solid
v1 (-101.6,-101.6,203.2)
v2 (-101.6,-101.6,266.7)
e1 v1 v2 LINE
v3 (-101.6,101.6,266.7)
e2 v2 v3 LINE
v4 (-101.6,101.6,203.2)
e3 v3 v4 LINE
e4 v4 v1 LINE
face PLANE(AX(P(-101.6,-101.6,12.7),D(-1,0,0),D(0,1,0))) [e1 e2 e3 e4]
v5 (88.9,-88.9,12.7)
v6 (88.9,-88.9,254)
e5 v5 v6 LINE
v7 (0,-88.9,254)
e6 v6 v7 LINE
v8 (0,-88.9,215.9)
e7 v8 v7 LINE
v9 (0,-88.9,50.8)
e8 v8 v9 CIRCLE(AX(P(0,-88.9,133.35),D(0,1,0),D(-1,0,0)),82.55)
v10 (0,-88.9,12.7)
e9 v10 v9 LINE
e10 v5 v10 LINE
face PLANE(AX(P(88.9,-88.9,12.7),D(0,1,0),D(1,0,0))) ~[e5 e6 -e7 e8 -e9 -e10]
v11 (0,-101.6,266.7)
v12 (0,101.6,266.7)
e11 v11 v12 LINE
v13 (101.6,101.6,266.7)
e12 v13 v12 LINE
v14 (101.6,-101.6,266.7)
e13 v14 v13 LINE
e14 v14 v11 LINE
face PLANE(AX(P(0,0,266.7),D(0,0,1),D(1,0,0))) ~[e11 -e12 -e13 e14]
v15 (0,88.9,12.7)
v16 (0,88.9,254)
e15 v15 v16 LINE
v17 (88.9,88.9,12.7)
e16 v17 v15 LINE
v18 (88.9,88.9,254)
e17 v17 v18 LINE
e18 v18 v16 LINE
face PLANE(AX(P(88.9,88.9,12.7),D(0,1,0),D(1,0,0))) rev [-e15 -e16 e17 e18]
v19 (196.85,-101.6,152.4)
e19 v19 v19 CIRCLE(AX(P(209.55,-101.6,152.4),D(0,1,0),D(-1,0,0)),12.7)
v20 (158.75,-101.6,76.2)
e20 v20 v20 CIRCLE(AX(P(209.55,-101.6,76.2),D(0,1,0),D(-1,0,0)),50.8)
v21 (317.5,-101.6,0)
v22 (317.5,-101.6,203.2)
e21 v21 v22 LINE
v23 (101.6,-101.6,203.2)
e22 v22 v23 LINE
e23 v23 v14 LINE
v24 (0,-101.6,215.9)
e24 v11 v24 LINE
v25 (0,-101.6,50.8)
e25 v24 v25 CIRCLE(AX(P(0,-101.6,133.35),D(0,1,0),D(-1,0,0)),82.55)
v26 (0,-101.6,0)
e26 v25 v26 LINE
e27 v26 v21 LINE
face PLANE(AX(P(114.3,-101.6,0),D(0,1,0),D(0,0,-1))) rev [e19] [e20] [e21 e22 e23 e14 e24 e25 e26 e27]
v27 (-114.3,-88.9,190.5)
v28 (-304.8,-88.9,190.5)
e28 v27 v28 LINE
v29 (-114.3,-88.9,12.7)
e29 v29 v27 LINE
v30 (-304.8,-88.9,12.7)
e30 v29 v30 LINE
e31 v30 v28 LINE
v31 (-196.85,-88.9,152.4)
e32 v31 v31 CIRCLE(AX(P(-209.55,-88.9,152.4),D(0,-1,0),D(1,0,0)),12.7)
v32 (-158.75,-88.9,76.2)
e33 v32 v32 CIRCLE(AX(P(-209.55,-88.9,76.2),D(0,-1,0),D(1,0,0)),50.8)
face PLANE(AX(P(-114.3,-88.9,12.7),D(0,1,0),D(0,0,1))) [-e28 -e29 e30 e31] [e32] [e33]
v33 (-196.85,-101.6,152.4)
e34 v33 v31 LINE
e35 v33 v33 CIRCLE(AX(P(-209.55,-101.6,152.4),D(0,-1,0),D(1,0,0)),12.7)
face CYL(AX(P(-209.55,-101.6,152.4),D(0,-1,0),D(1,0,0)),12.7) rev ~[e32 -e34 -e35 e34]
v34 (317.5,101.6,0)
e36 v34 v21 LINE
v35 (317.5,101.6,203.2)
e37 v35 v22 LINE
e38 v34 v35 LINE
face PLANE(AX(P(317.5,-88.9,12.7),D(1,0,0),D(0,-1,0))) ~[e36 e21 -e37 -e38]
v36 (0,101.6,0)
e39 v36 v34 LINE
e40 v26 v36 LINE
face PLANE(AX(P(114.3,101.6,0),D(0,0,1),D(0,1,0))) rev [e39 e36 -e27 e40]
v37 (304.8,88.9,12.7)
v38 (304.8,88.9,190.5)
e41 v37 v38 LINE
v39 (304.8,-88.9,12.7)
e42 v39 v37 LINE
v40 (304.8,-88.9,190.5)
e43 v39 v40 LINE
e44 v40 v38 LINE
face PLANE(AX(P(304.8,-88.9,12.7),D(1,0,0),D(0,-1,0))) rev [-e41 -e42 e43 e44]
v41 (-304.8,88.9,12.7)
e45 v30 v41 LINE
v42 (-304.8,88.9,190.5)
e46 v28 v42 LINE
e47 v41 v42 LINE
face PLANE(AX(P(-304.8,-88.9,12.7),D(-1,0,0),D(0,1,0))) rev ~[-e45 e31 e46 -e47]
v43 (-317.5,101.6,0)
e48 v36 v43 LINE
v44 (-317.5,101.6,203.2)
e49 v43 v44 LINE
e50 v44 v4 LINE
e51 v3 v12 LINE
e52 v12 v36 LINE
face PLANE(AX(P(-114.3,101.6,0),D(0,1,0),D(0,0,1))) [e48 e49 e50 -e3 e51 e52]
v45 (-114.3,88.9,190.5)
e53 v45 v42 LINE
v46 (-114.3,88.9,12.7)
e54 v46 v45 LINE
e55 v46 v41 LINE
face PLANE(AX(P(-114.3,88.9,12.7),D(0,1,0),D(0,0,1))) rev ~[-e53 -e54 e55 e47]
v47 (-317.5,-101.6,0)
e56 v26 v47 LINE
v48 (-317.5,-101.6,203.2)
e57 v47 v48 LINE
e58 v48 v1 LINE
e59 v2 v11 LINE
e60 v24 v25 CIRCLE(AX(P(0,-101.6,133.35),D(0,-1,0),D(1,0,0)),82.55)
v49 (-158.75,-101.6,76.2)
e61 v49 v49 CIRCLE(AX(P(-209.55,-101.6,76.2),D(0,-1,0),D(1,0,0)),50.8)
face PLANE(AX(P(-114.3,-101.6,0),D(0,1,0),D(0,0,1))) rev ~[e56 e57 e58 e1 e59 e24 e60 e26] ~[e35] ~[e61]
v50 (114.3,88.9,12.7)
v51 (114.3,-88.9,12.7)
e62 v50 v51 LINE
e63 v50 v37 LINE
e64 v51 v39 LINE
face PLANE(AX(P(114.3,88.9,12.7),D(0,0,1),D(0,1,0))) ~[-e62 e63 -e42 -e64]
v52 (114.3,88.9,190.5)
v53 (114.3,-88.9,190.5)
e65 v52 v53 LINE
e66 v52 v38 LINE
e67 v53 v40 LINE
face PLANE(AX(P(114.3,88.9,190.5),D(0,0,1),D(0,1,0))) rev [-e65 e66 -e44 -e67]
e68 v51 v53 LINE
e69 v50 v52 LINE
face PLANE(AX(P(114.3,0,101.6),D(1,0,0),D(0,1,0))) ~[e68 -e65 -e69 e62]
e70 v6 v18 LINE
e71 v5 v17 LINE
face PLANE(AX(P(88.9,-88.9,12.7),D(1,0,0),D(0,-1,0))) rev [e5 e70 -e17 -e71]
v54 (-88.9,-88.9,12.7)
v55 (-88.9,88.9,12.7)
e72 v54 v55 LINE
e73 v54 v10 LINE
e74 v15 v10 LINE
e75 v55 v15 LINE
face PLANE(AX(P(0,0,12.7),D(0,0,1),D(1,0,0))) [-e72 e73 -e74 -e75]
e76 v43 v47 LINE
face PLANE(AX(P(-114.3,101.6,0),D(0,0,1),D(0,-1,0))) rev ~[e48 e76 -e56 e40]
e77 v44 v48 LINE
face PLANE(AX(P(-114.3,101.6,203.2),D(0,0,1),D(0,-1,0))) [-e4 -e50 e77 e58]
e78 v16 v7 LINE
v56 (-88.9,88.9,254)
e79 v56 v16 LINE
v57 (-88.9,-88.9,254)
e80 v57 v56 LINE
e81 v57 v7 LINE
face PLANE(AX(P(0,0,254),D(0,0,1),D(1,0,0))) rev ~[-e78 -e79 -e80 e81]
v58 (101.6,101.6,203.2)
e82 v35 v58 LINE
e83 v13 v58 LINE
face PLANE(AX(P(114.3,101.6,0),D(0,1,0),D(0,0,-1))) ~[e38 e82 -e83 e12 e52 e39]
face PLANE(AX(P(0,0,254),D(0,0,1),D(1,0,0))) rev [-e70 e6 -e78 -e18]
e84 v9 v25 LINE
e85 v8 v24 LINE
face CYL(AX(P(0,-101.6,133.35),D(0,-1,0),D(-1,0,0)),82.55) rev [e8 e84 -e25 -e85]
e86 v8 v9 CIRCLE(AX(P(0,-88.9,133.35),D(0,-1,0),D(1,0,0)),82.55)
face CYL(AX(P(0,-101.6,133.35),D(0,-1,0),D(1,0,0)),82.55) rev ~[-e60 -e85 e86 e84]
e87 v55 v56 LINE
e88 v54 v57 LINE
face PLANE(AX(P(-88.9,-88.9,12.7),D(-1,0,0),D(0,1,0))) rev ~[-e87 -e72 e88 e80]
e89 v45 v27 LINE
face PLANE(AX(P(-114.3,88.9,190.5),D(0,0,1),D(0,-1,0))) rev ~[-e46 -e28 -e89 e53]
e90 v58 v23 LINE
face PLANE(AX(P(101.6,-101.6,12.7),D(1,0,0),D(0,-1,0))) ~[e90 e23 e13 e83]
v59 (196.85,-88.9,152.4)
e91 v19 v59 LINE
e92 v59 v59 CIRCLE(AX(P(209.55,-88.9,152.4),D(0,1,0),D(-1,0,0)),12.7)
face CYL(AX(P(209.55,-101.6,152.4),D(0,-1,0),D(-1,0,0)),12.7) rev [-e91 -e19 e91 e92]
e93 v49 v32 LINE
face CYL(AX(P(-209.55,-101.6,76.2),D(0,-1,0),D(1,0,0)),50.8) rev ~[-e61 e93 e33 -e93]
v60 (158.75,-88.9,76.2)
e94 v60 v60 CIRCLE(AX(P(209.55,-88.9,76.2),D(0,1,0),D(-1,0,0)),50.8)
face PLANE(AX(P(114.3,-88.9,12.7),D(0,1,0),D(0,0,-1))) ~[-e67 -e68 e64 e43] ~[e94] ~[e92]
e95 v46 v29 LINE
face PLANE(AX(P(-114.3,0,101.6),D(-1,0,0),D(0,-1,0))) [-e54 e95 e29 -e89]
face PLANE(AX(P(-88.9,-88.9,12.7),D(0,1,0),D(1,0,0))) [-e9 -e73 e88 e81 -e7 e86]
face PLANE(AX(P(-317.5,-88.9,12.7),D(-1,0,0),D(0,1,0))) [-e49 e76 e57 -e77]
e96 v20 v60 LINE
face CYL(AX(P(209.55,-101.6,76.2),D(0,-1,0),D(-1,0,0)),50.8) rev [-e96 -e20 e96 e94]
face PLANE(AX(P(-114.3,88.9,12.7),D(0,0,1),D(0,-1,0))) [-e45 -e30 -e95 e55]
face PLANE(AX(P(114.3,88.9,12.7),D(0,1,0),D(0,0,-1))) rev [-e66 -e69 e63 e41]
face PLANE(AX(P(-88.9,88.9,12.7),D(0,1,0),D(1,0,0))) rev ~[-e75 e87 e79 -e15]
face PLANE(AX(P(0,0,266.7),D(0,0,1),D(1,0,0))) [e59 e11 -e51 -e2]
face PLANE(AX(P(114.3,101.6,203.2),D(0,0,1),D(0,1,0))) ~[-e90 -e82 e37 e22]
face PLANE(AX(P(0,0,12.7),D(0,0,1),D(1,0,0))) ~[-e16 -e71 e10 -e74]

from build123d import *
from build123d import SkipClean  # not in build123d's __all__

# Parameters (mm, degrees)
F0_W      = 203.2
F0_H      = 203.2
F1_DEPTH  = 12.7
F2_W      = 203.2
F2_H      = 203.2
F2_W_2    = 177.8
F2_H_2    = 177.8
F3_DEPTH  = 254
F4_W      = 203.2
F4_H      = 203.2
F4_W_2    = 177.8
F4_H_2    = 177.8
F5_DEPTH  = 12.7
F6_W      = 203.2
F6_H      = 203.2
F7_DEPTH  = 12.7
F8_W      = 203.2
F8_H      = 203.2
F8_W_2    = 177.8
F8_H_2    = 177.8
F9_DEPTH  = 203.2
F10_W     = 12.7
F10_H     = 177.8
F11_DEPTH = 177.8
F12_R     = 50.8
F12_R_2   = 12.7
F12_R_3   = 82.55
F13_DEPTH = 25.4
F15_DEPTH = 203.2


with BuildPart() as f1:
    # F0 (on Top) → F1 (new body)
    with BuildSketch(Plane.XY):
        Rectangle(F0_W, F0_H)
    extrude(amount=F1_DEPTH)

    # F2 (on face) → F3 (join)
    with BuildSketch(Plane.XY.offset(12.7)):
        Rectangle(F2_W, F2_H)
        Rectangle(F2_W_2, F2_H_2, mode=Mode.SUBTRACT)
    extrude(amount=F3_DEPTH)

    # F4 (on face) → F5 (join)
    with BuildSketch(Plane.XY.offset(266.7)):
        Rectangle(F4_W, F4_H)
        Rectangle(F4_W_2, F4_H_2, mode=Mode.SUBTRACT)
        Rectangle(F4_W_2, F4_H_2)
    extrude(amount=-F5_DEPTH)

    # F6 (on face) → F7 (join)
    with BuildSketch(Plane(origin=(-101.6, 0, 0), x_dir=(0, -1, 0), z_dir=(-1, 0, 0))):
        with Locations((0, 101.6)):
            Rectangle(F6_W, F6_H)
    extrude(amount=F7_DEPTH)

    # F8 (on face) → F9 (join)
    with BuildSketch(Plane(origin=(-114.3, 0, 0), x_dir=(0, -1, 0), z_dir=(-1, 0, 0))):
        with Locations((0, 101.6)):
            Rectangle(F8_W, F8_H)
        with Locations((0, 101.6)):
            Rectangle(F8_W_2, F8_H_2, mode=Mode.SUBTRACT)
    extrude(amount=F9_DEPTH)

    # F10 (on face) → F11 (join)
    with BuildSketch(Plane.XY.offset(12.7)):
        with Locations((-311.15, 0)):
            Rectangle(F10_W, F10_H)
    extrude(amount=F11_DEPTH)

    # F12 (on face) → F13 (cut)
    with BuildSketch(Plane.XZ.offset(101.6)):
        with Locations((-209.55, 76.2)):
            Circle(F12_R)
        with Locations((-209.55, 152.4)):
            Circle(F12_R_2)
        with Locations((0, 133.35)):
            Circle(F12_R_3)
    extrude(amount=-F13_DEPTH, mode=Mode.SUBTRACT)

    # F14 (on face) → F15 (cut)
    with BuildSketch(Plane.XZ.offset(101.6)):
        with BuildLine():
            Line((101.6, 0), (101.6, 266.7))
            Line((101.6, 266.7), (0, 266.7))
            Line((0, 266.7), (0, 215.9))
            ThreePointArc((0, 215.9), (58.3716647869, 191.7216647869), (82.55, 133.35))
            ThreePointArc((82.55, 133.35), (58.3716647869, 74.9783352131), (0, 50.8))
            Line((0, 50.8), (0, 0))
            Line((0, 0), (101.6, 0))
        make_face()
        with BuildLine():
            ThreePointArc((82.55, 133.35), (58.3716647869, 191.7216647869), (0, 215.9))
            Line((0, 215.9), (0, 50.8))
            ThreePointArc((0, 50.8), (58.3716647869, 74.9783352131), (82.55, 133.35))
        make_face()
    extrude(amount=-F15_DEPTH, mode=Mode.SUBTRACT)

    # F16: F1 across face


with BuildPart() as f1_1:
    add(f1.part, clean=False)
    with SkipClean():  # cleaning this boolean's faces spoils the solid; the shape is the same uncleaned
        add(f1.part.mirror(Plane(origin=(0, 21.7236842105, 133.35), x_dir=(0, 1, 0), z_dir=(1, 0, 0))), clean=False)


solid = f1_1.part
